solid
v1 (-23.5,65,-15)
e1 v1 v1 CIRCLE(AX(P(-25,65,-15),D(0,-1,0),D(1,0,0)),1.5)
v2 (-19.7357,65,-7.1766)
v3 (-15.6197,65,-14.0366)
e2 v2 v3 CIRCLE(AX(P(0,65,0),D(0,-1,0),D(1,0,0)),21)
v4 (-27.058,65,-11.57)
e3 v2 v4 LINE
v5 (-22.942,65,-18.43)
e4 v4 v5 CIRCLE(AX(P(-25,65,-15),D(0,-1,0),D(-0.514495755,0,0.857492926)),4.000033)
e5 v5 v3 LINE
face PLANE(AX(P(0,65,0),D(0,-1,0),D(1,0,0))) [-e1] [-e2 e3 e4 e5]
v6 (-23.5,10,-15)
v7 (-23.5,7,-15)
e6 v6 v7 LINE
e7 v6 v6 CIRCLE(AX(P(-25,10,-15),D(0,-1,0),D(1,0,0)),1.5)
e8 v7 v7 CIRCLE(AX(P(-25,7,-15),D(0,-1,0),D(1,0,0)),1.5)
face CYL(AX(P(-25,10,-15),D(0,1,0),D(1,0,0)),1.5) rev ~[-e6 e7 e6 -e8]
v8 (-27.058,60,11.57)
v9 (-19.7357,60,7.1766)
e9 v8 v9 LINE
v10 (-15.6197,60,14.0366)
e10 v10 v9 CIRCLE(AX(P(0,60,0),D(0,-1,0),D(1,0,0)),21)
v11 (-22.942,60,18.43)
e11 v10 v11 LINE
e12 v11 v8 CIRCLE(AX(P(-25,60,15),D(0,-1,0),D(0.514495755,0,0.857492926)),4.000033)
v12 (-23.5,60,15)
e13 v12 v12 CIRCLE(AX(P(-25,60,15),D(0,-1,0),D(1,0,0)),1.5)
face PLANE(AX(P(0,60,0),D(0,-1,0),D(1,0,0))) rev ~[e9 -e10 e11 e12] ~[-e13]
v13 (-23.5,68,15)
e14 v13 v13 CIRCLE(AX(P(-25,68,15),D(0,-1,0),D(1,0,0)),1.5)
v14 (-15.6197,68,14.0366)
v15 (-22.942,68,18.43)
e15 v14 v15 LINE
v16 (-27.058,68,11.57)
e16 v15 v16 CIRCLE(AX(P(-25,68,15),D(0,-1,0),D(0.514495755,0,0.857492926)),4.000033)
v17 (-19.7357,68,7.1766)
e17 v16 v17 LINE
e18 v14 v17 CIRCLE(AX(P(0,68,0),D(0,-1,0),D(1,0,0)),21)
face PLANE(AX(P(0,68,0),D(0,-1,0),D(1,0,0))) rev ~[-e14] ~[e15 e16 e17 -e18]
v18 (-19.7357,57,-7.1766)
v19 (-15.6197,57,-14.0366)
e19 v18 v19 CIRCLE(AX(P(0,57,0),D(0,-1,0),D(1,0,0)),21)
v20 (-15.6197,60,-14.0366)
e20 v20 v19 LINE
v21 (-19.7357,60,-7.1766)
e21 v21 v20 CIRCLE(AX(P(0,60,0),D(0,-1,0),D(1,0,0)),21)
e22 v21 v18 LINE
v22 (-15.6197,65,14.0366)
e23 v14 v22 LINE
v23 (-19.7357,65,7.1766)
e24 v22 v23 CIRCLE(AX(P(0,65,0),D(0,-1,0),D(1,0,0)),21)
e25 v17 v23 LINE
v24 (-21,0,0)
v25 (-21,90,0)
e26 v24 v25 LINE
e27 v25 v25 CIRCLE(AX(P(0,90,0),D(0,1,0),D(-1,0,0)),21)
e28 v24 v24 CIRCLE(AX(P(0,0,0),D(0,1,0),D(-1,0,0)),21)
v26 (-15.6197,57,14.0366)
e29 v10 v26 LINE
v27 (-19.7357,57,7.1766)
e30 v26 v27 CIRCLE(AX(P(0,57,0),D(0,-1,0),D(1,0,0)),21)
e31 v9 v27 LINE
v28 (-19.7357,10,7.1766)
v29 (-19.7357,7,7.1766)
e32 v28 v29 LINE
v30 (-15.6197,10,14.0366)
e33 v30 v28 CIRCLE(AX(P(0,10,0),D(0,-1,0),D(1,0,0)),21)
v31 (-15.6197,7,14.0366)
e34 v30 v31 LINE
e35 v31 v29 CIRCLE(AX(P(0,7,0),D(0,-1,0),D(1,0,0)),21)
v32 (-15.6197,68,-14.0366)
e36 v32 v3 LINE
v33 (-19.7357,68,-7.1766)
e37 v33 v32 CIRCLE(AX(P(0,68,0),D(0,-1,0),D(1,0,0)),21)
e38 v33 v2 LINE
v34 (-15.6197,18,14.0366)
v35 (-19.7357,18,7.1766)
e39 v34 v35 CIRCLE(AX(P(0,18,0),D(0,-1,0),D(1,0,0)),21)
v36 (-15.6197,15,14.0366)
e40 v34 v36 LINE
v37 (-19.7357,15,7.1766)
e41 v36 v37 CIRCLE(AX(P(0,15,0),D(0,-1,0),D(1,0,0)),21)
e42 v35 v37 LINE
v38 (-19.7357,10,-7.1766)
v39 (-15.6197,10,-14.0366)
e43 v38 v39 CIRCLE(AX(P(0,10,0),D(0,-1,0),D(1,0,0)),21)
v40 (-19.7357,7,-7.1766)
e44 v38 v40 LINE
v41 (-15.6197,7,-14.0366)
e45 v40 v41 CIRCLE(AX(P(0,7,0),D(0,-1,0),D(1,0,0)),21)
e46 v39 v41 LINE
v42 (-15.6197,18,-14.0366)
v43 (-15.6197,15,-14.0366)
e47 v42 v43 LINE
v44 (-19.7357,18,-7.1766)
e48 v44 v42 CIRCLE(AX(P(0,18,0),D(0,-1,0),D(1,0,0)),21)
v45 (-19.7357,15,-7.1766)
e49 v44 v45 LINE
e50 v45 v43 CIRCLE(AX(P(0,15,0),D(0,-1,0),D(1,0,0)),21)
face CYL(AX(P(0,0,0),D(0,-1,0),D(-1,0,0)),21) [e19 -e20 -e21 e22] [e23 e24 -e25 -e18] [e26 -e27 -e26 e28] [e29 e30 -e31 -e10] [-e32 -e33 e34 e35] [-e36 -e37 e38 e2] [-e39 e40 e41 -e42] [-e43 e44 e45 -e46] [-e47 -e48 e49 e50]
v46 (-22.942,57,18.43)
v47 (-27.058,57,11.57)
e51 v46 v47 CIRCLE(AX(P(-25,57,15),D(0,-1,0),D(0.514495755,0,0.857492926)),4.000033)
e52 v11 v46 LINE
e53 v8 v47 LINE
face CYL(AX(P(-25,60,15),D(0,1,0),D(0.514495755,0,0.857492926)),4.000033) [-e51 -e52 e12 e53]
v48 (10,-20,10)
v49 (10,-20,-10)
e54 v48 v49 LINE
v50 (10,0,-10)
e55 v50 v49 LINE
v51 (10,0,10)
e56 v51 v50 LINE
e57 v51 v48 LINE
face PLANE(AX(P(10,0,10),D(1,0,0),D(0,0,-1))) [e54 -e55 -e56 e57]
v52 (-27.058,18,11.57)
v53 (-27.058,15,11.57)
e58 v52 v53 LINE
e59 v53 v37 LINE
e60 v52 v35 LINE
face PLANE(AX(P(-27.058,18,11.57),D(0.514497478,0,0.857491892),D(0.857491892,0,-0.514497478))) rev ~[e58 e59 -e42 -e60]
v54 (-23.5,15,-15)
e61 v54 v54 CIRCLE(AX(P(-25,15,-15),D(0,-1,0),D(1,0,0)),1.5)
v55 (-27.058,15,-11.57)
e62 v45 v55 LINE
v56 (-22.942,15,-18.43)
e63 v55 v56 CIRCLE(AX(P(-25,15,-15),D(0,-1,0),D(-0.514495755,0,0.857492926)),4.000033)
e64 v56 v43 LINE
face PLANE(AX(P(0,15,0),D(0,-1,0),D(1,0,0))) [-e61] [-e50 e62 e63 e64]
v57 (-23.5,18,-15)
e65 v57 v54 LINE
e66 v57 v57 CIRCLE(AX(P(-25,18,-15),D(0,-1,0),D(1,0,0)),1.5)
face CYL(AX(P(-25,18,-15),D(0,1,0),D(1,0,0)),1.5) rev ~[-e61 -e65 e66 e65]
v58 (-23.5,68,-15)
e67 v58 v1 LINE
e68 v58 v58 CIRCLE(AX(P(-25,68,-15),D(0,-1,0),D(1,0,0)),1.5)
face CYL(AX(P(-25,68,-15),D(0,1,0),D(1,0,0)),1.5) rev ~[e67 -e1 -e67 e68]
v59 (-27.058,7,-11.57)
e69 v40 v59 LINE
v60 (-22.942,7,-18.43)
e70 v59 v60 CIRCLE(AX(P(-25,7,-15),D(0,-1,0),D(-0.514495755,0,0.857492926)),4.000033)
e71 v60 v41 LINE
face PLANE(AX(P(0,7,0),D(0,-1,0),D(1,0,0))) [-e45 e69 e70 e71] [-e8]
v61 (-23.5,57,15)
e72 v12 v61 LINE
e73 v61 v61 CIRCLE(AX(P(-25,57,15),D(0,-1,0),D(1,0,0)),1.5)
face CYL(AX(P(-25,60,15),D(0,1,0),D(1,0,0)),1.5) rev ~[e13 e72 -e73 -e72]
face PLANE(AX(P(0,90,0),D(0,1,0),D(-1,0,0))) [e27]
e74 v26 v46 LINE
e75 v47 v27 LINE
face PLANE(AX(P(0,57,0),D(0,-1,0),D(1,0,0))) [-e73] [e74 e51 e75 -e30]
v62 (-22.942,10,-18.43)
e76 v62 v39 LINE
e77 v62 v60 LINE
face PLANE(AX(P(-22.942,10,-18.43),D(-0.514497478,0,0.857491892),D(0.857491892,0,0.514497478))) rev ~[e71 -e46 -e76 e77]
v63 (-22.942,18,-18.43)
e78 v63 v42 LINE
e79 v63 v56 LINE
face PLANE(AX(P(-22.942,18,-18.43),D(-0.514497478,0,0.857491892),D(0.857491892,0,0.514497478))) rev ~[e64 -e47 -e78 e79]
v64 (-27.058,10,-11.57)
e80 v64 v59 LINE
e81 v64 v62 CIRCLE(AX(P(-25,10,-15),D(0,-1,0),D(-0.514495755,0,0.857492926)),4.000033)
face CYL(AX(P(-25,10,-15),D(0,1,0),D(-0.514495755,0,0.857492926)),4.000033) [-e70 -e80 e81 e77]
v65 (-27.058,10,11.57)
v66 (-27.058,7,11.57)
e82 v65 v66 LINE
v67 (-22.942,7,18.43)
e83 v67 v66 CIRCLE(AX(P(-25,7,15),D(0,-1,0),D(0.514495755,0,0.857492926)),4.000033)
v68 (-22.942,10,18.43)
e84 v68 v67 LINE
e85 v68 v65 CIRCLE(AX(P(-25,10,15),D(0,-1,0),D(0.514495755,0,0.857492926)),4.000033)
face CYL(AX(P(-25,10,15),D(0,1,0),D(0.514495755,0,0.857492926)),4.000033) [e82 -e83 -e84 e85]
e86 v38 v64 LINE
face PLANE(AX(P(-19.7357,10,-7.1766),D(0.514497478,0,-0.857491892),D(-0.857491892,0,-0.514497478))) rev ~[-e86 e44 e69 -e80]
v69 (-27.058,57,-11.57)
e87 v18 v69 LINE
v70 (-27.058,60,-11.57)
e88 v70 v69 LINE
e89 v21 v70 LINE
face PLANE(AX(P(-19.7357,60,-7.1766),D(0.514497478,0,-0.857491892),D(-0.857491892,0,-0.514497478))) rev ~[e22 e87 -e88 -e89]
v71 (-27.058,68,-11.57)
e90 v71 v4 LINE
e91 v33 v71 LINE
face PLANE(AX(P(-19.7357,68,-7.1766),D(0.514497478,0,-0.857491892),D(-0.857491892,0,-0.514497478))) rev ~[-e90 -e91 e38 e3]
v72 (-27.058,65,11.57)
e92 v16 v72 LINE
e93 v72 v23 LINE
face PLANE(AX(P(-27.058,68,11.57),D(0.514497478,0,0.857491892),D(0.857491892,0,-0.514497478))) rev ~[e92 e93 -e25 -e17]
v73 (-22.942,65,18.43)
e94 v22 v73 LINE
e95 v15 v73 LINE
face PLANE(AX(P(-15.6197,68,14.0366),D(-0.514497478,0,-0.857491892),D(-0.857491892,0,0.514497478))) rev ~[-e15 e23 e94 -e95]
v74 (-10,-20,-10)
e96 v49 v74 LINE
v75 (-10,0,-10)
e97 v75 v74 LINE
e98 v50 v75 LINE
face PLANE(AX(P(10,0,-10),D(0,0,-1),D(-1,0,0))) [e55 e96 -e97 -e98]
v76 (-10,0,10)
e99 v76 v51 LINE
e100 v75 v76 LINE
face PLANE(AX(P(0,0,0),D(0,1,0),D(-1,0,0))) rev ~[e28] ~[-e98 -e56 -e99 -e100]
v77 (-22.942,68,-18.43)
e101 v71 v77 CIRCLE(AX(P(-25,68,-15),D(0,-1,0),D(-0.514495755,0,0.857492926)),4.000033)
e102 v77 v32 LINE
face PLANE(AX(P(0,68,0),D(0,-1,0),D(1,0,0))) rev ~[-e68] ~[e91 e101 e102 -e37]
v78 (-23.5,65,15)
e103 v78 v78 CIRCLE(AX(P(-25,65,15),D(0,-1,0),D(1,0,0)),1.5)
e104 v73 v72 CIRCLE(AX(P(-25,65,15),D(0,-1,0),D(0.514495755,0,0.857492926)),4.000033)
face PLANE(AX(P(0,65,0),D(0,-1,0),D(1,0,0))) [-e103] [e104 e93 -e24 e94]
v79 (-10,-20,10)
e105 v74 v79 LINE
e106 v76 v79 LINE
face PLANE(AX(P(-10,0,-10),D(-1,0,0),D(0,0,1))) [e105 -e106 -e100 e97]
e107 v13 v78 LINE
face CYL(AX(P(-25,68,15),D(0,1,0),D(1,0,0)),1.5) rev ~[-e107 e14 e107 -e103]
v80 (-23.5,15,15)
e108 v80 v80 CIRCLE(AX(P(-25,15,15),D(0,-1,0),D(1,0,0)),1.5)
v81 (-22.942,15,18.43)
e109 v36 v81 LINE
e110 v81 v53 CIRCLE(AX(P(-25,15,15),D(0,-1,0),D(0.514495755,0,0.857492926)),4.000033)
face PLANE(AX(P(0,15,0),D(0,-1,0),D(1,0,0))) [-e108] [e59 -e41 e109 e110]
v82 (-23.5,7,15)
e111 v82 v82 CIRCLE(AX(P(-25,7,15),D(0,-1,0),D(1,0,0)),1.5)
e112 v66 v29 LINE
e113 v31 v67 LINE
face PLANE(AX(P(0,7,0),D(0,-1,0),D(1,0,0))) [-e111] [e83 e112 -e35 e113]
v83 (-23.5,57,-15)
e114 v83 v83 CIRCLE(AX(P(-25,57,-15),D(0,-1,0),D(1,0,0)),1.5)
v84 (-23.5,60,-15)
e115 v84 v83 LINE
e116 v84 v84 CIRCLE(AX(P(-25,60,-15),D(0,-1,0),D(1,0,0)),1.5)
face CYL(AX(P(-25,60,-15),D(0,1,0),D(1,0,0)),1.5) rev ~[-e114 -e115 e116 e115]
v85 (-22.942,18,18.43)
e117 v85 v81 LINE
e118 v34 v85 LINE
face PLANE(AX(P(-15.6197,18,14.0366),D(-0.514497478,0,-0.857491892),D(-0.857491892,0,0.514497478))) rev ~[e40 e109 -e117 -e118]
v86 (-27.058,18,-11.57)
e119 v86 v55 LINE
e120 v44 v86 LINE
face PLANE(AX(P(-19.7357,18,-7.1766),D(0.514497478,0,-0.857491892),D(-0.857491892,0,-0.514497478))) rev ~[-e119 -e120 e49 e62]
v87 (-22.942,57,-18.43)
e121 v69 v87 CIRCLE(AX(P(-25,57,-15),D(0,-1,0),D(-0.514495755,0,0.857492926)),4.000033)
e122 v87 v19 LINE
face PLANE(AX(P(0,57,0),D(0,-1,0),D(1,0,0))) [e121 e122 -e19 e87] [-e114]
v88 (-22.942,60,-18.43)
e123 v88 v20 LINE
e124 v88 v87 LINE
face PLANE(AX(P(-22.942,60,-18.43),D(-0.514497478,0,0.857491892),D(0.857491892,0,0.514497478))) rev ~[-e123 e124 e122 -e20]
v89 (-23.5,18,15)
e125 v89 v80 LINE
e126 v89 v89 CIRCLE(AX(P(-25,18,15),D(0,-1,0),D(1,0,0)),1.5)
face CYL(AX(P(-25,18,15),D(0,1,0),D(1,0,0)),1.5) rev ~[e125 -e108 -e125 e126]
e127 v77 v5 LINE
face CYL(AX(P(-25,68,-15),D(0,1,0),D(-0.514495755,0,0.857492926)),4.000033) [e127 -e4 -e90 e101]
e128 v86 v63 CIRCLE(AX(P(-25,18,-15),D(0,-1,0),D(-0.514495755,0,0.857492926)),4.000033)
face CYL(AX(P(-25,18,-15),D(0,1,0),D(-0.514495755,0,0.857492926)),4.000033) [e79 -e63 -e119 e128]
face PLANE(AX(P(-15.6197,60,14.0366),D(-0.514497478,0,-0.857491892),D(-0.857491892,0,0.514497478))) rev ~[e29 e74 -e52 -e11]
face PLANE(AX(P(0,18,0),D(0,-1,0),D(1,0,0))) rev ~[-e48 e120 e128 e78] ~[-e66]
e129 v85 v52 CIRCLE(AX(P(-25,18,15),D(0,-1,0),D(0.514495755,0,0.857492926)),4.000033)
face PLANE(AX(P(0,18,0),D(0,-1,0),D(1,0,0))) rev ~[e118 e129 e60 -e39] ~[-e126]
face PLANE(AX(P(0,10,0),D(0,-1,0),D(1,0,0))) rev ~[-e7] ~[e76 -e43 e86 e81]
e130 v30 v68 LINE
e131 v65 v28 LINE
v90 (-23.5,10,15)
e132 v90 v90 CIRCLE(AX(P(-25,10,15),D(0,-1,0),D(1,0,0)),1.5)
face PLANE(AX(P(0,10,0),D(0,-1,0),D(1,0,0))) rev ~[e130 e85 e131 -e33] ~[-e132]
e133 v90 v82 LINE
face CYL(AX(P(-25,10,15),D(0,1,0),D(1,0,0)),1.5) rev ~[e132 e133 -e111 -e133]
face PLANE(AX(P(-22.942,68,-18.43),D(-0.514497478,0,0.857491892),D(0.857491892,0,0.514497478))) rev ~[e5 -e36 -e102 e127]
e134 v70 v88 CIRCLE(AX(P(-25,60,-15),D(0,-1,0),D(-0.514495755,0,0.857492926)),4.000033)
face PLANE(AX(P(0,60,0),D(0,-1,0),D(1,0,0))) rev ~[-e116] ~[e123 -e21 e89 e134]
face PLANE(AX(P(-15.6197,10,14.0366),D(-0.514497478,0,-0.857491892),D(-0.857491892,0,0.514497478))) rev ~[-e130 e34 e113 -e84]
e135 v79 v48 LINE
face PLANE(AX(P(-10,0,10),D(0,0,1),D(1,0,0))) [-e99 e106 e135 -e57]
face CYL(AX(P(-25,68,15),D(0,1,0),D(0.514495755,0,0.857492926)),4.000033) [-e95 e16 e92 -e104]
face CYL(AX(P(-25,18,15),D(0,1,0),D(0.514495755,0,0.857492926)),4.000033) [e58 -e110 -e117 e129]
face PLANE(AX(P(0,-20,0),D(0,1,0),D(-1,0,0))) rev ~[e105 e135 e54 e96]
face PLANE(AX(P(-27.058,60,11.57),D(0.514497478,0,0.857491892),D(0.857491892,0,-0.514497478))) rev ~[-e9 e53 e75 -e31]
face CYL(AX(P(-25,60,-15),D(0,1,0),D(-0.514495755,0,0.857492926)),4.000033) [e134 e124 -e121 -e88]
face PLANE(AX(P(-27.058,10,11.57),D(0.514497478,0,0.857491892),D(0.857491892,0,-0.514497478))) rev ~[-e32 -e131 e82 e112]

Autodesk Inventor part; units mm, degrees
ref_plane "YZ Plane" through (0, 0, 0) normal (1, 0, 0) x (0, 1, 0)
ref_plane "XZ Plane" through (0, 0, 0) normal (0, 1, 0) x (-1, 0, 0)
sketch "Sketch1" plane through (0, 0, 0) normal (0, 1, 0) x (-1, 0, 0)
  circle A0 centre (0, 0) radius 21
  line L0 (10, 10) -> (-10, 10)
  line L1 (-10, 10) -> (-10, -10)
  line L2 (-10, -10) -> (10, -10)
  line L3 (10, -10) -> (10, 10)
  line L4 (10, 10) -> (-10, -10) construction
  line L5 (-10, 10) -> (10, -10) construction
  dimension "d0" = 42
  dimension "d1" = 20
  dimension "d2" = 20
extrude "Extrusion1" add sketch "Sketch1" along normal blind 90 contours A0 | L3 L2 L1 L0
extrude "Extrusion2" add sketch "Sketch1" against normal blind 20 contours L3 L2 L1 L0
ref_plane "Work Plane1" through (0, 10, 0) normal (0, -1, 0) x (1, 0, 0)
sketch "Sketch2" plane through (0, 10, 0) normal (0, -1, 0) x (1, 0, 0)
  circle A0 centre (-25, 15) radius 1.5
  circle A1 centre (-25, -15) radius 1.5
  circle A2 centre (0, 0) radius 21 projected
  line L0 (-15.6197, 14.0366) -> (-22.942, 18.43)
  arc A3 (-22.942, 18.43) -> (-27.058, 11.57) centre (-25, 15) ccw
  line L1 (-27.058, 11.57) -> (-19.7357, 7.1766)
  line L2 (-19.7357, -7.1766) -> (-27.058, -11.57)
  arc A4 (-27.058, -11.57) -> (-22.942, -18.43) centre (-25, -15) ccw
  line L3 (-22.942, -18.43) -> (-15.6197, -14.0366)
  line L4 (-25, 15) -> (0, 0) construction
  line L5 (0, 0) -> (-25, -15) construction
  point P0 (-21, 0)
  dimension "d8" = 3
  dimension "d9" = 30
  dimension "d10" = 15
  dimension "d11" = 4
  dimension "d12" = 4
  dimension "d13" = 4
extrude "Extrusion3" add sketch "Sketch2" along normal blind 3 contours A2 L1 A3 L0 | L3 A4 L2 A2
pattern_linear "Rectangular Pattern2" count 2 spacing 8 along (0, 1, 0) of "Extrusion3"
pattern_linear "Rectangular Pattern1" count 2 spacing 50 along (0, 1, 0) of "Extrusion3", "Rectangular Pattern2"
properties part number "MockPitchMotor" material "ABS Plastic"
